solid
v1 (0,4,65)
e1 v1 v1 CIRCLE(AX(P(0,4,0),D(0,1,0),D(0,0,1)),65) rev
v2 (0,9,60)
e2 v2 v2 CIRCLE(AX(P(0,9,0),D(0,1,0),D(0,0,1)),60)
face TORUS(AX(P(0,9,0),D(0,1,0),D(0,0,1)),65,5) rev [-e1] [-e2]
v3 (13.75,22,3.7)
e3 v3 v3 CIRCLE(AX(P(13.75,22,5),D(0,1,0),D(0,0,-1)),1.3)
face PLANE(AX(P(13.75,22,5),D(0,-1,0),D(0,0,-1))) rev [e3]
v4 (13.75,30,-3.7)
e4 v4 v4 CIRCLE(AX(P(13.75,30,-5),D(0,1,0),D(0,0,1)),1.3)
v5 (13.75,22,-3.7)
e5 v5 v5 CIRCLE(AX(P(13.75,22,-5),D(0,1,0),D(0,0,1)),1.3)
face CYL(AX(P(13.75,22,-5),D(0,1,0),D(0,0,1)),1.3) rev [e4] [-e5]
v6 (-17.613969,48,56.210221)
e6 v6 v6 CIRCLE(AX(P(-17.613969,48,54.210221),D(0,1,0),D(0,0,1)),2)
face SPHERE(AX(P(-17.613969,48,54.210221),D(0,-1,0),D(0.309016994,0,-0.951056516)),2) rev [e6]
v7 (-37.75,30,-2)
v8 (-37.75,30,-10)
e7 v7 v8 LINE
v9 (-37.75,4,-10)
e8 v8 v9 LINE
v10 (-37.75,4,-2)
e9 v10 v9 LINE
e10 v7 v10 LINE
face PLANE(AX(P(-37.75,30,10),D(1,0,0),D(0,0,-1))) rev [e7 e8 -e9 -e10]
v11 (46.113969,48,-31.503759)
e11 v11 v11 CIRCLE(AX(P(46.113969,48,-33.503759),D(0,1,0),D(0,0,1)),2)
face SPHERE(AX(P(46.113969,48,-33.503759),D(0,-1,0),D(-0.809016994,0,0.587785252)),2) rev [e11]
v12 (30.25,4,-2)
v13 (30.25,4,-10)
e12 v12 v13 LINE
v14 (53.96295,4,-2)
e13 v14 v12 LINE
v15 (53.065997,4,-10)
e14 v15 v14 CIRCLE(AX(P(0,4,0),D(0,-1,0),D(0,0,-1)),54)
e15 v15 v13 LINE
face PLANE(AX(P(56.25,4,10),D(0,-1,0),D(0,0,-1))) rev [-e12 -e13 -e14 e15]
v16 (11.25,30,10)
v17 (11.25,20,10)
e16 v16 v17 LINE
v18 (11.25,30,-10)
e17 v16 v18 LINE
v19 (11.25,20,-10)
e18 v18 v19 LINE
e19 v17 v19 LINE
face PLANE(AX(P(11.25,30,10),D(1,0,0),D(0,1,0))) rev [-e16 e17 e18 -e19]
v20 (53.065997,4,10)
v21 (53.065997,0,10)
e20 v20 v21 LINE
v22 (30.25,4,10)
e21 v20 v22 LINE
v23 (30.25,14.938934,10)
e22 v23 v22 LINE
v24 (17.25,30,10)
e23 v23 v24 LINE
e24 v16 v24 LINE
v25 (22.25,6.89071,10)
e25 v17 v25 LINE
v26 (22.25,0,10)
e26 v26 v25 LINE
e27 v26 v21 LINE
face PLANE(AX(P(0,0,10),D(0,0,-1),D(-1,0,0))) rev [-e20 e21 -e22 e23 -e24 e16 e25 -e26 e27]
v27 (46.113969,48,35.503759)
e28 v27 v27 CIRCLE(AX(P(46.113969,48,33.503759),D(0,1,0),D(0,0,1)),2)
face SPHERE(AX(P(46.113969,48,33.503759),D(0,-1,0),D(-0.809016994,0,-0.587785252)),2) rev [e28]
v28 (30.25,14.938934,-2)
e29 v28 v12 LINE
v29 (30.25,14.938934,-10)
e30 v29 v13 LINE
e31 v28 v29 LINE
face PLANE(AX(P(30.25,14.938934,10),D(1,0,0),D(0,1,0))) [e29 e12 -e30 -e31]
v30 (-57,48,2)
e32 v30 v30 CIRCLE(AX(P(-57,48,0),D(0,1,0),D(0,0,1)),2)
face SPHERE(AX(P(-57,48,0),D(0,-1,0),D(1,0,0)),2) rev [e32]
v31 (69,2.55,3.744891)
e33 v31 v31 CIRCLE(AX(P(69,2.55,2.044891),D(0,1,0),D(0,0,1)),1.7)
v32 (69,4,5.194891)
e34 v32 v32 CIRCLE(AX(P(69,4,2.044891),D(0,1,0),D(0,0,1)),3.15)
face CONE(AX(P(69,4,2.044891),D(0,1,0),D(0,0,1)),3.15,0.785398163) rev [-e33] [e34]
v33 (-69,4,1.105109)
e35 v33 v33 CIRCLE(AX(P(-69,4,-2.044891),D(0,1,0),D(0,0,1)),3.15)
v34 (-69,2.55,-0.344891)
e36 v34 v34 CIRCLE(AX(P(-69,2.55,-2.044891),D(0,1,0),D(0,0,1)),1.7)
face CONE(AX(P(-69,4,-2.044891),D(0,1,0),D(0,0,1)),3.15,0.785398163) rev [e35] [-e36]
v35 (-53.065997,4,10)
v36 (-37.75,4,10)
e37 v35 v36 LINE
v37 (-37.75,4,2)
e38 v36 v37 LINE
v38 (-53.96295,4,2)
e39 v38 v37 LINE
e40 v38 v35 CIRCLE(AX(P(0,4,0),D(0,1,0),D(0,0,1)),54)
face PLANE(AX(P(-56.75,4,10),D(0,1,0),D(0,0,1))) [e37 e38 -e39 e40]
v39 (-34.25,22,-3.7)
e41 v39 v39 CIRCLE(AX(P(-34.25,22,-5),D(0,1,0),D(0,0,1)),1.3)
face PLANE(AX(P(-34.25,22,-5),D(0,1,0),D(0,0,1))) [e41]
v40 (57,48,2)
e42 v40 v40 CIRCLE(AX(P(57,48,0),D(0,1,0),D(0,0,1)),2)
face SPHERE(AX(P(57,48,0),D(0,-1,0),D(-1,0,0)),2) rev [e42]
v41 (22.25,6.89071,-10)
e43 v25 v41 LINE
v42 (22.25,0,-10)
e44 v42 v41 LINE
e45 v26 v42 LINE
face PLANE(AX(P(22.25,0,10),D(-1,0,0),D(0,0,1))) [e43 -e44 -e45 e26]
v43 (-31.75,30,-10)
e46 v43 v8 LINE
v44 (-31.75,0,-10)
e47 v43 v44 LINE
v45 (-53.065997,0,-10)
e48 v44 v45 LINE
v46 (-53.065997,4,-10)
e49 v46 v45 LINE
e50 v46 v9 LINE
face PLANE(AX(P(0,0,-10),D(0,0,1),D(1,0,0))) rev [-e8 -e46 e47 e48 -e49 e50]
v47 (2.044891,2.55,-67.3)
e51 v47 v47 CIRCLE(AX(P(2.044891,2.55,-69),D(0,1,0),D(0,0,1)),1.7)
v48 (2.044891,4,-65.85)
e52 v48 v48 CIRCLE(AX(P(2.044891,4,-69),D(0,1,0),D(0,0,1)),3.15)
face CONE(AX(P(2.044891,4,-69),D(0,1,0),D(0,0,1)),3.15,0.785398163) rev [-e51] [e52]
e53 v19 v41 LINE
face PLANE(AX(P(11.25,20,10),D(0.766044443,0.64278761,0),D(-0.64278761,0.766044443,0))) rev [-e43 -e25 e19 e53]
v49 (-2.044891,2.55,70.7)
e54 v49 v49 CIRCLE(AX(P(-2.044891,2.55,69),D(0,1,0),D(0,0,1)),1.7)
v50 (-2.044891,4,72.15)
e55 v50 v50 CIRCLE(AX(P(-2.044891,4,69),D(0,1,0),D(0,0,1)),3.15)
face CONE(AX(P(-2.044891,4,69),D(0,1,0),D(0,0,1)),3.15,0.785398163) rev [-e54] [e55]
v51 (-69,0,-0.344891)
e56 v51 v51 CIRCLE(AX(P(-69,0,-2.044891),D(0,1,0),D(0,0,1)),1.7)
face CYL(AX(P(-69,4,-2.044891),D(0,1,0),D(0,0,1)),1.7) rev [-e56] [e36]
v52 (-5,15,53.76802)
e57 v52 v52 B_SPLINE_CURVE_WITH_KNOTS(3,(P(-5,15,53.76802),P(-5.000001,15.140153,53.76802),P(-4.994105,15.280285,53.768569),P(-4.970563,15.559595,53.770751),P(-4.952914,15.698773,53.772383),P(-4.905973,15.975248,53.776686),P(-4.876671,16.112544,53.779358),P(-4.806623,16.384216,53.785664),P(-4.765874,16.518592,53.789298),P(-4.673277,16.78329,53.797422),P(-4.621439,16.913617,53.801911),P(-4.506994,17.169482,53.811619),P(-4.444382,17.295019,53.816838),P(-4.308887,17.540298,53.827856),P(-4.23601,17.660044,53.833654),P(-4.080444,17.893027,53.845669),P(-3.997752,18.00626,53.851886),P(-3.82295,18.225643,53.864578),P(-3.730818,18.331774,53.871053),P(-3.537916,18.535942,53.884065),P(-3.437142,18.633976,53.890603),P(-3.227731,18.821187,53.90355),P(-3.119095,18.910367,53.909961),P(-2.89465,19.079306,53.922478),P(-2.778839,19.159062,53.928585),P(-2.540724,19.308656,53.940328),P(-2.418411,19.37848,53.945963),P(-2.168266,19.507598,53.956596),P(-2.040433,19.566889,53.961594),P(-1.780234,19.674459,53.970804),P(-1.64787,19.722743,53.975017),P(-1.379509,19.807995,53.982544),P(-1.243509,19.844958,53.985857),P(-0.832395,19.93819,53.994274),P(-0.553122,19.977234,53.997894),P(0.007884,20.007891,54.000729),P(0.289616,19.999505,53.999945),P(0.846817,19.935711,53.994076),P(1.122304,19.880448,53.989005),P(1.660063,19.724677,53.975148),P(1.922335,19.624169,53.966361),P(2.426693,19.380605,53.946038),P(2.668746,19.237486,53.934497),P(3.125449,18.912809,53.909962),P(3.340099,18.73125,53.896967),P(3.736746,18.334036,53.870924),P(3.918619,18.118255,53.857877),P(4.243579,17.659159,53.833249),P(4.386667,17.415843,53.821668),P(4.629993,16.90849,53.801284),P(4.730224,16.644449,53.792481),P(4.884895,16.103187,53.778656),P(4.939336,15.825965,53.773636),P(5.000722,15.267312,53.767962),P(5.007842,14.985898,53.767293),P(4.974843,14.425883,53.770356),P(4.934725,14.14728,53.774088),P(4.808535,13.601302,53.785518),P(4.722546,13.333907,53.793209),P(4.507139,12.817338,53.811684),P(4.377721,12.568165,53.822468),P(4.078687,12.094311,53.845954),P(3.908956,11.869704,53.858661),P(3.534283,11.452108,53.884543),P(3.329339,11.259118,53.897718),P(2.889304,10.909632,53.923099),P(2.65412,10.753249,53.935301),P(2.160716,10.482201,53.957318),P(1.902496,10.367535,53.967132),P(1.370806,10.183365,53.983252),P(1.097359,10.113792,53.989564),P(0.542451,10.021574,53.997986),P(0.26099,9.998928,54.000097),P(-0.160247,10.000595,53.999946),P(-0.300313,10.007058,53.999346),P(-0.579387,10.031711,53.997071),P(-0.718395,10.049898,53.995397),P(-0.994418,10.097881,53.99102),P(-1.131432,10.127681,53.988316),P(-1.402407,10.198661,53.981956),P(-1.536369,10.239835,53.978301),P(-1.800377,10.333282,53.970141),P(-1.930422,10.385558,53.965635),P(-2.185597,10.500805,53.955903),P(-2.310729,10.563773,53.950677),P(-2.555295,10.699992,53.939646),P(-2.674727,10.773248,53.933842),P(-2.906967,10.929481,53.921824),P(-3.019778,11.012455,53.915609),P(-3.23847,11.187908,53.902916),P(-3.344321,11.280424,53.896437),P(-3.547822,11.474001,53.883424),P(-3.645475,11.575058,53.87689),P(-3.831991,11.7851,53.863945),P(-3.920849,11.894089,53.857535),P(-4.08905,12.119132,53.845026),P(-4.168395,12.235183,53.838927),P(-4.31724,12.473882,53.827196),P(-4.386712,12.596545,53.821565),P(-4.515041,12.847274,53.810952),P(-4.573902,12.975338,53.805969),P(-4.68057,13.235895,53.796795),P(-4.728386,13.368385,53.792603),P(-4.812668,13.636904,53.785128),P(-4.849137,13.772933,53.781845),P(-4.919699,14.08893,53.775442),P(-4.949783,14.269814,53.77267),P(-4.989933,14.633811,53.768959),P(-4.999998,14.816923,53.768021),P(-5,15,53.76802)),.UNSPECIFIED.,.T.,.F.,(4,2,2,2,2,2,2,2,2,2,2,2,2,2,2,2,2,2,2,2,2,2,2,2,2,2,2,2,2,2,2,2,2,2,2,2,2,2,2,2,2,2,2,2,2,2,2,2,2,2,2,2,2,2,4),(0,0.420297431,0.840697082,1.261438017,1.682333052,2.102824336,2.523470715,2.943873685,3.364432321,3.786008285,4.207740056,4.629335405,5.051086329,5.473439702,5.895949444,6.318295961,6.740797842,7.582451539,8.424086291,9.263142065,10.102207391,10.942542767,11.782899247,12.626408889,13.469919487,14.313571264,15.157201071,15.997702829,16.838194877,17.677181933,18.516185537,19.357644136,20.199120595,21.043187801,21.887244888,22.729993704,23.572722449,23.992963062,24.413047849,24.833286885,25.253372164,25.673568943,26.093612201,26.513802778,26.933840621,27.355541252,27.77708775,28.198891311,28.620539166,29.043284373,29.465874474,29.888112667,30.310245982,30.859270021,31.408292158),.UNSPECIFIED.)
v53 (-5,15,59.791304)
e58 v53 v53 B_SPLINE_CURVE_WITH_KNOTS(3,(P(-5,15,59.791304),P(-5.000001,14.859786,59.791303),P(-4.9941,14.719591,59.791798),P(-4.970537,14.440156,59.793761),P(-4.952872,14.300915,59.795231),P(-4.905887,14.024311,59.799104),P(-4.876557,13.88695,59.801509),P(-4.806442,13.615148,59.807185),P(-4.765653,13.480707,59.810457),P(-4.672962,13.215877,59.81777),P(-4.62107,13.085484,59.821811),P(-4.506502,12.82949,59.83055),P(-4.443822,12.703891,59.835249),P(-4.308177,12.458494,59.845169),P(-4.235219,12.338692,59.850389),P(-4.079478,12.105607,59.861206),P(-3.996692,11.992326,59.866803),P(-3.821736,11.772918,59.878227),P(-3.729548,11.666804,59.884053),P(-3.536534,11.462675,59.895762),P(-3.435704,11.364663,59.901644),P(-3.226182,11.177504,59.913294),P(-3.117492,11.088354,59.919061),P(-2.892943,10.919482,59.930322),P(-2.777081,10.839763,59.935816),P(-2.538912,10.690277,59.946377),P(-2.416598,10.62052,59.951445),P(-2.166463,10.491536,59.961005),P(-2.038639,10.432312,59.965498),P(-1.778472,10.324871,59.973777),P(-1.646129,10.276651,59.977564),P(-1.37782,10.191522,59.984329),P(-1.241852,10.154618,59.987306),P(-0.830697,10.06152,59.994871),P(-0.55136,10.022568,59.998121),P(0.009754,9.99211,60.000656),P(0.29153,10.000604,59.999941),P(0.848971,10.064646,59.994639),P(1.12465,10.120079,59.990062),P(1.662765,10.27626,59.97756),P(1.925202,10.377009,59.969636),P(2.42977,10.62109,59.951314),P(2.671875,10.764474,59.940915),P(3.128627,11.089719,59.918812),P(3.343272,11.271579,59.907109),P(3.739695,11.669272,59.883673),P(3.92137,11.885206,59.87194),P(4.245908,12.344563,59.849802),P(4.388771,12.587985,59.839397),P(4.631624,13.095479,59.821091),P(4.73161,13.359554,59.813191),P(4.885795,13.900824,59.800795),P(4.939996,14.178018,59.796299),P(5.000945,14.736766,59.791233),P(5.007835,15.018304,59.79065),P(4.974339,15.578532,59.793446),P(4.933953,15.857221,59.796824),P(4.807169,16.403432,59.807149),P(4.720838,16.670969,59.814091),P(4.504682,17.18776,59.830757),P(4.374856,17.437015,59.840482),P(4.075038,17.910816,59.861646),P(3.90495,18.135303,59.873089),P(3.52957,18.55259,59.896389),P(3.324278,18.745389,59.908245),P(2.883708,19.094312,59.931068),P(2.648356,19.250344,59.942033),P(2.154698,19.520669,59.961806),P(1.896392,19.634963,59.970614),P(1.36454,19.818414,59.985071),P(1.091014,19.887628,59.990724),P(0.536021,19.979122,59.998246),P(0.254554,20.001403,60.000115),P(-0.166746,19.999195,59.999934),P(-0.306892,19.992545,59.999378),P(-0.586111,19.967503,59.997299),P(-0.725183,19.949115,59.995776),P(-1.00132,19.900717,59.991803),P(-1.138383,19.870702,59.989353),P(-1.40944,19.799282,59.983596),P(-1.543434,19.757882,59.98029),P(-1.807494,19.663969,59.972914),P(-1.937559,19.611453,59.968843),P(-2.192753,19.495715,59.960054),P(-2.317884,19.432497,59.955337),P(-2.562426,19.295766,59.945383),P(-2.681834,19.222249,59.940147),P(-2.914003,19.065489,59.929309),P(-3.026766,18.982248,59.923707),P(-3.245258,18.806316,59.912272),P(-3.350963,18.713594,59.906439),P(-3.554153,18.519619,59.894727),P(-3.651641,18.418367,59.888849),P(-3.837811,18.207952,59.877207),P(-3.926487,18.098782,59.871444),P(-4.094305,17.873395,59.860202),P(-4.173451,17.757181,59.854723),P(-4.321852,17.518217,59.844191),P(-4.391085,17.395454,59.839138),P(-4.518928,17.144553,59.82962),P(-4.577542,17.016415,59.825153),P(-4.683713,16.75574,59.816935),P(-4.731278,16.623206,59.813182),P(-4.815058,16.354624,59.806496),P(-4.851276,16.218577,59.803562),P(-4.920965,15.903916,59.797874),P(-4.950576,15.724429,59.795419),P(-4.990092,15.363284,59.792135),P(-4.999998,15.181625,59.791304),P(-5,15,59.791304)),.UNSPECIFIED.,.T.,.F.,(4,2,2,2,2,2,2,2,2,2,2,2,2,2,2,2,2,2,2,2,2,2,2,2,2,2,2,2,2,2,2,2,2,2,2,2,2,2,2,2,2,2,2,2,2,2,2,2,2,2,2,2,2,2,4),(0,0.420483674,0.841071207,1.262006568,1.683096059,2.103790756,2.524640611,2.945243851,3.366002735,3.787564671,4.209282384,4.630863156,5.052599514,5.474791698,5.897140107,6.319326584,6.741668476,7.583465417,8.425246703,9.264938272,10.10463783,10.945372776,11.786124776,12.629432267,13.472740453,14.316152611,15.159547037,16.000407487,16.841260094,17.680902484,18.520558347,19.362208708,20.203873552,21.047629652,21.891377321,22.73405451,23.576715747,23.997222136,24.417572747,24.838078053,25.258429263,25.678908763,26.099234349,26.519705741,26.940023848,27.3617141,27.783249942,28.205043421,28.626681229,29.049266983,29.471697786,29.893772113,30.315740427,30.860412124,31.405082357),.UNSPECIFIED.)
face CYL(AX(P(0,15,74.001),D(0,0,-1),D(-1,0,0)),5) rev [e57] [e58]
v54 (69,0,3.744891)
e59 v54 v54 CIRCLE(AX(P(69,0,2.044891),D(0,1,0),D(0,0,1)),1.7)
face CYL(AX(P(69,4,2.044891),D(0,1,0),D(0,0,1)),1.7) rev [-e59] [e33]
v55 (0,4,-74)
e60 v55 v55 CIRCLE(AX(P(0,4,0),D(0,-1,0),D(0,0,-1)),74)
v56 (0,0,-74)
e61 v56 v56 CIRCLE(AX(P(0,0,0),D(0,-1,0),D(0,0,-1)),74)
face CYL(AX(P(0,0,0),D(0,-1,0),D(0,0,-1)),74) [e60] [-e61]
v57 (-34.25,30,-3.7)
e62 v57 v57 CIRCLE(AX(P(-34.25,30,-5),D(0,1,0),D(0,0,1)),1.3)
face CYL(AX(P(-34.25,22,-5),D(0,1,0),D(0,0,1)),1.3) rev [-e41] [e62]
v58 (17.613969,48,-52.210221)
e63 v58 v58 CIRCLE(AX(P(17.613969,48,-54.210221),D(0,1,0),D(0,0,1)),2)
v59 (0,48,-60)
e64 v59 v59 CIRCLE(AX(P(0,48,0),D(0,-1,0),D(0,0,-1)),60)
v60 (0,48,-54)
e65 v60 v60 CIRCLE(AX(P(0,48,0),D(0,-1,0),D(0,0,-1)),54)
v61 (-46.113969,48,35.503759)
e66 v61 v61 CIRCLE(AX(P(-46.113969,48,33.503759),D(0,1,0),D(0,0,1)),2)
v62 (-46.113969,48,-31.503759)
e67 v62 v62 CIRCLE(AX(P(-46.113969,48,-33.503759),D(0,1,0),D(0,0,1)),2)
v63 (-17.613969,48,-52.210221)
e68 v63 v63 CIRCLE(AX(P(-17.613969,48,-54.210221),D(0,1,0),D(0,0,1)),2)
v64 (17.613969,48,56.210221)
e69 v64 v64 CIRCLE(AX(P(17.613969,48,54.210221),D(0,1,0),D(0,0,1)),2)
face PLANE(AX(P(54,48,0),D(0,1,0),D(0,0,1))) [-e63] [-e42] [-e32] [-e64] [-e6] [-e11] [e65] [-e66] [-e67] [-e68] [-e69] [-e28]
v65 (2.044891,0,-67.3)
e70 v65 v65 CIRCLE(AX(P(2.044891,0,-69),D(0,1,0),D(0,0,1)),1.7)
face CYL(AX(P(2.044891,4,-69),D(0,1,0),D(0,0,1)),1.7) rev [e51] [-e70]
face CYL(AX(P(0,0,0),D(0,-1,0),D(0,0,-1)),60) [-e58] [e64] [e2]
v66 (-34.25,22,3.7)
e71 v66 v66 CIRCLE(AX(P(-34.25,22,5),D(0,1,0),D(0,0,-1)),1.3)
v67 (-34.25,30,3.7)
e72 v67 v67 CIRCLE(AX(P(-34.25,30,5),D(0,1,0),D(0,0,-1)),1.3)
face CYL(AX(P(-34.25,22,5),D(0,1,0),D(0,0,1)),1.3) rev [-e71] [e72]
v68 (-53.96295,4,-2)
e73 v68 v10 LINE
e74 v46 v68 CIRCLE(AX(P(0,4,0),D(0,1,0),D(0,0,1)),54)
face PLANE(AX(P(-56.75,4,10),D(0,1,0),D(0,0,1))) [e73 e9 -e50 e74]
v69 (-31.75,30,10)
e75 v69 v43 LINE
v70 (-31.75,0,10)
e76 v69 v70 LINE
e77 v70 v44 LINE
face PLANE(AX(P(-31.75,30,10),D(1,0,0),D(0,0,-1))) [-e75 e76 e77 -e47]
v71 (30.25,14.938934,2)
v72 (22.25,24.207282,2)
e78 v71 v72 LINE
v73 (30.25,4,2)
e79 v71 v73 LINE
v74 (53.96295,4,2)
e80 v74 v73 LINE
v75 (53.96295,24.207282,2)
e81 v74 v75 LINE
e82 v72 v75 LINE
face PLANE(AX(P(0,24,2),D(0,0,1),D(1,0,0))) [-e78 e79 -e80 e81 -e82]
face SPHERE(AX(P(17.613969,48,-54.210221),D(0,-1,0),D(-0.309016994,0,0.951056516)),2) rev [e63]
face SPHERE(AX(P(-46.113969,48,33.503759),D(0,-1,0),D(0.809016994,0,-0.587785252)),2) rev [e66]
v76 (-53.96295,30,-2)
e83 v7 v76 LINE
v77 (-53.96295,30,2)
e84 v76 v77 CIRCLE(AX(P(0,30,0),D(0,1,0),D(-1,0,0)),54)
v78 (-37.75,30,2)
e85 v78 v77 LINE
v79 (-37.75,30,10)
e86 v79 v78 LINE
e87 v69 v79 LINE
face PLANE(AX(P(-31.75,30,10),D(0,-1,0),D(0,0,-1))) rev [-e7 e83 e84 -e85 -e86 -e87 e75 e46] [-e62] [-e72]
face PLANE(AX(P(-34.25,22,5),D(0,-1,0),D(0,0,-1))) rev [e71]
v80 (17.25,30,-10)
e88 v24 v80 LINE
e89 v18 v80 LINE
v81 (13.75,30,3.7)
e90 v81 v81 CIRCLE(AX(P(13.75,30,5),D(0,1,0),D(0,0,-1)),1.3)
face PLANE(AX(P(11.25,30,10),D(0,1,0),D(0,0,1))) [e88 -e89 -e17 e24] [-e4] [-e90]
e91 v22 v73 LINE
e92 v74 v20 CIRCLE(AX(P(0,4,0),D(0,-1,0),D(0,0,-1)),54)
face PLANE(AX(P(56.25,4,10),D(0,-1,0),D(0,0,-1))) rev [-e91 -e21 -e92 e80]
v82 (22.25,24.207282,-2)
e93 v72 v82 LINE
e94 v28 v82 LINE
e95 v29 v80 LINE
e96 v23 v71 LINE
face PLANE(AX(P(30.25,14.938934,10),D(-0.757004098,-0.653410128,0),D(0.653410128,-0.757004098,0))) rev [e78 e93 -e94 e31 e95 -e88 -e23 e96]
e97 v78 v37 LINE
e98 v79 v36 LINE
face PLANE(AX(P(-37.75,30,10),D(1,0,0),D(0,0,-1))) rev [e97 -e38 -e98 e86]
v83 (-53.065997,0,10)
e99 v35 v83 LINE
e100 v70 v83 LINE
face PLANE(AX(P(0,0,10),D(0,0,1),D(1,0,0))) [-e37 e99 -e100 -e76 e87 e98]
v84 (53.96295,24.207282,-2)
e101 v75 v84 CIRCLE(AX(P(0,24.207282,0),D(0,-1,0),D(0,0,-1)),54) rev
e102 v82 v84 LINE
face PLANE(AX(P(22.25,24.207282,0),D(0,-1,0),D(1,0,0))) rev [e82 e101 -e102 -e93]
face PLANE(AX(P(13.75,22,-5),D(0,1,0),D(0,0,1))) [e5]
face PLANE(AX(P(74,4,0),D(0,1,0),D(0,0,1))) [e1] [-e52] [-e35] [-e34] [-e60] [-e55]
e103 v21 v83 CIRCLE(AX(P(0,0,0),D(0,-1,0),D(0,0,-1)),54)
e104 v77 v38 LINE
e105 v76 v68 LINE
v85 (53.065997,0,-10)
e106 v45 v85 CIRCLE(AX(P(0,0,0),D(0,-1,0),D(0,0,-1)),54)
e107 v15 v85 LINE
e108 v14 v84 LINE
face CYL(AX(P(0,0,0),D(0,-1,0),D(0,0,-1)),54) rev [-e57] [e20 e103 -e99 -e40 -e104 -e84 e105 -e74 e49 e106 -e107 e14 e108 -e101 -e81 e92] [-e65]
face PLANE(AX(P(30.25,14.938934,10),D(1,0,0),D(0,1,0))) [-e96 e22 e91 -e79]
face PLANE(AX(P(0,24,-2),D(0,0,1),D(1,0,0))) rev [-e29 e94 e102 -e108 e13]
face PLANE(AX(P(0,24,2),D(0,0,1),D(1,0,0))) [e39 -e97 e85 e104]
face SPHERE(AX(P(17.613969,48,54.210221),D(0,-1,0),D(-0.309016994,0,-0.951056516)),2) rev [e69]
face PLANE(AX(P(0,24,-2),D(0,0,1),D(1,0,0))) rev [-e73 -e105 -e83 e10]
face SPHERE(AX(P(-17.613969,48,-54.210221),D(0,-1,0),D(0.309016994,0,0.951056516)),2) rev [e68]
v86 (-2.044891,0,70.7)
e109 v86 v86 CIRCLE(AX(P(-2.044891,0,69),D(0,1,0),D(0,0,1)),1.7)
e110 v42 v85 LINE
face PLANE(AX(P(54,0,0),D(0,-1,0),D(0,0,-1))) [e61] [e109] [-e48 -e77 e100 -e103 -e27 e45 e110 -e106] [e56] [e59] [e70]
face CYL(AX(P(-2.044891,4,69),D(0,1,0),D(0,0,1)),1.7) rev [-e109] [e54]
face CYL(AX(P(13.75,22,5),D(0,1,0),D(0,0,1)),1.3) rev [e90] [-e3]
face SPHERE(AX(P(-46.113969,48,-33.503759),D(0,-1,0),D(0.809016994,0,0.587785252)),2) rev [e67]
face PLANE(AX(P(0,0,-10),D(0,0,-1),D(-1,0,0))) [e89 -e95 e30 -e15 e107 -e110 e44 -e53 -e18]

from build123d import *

# Parameters (mm, degrees)
FILLET1_R                                            = 5
CSK_FOR_M3_COUNTERSUNK_RAISED_HEAD_SCREW_D           = 3.4
CSK_FOR_M3_COUNTERSUNK_RAISED_HEAD_SCREW_CSINK_D     = 6.3
CSK_FOR_M3_COUNTERSUNK_RAISED_HEAD_SCREW_CSINK_ANGLE = 90
CIRPATTERN2_COUNT                                    = 4
CIRPATTERN3_COUNT                                    = 10
BOSS_EXTRUDE1_DEPTH                                  = 10
SKETCH14_R                                           = 1.3
CUT_EXTRUDE1_DEPTH                                   = 8
RIB1_REACH                                           = 117.135
SKETCH15_WALL_W                                      = 251.269407434
SKETCH15_WALL_H                                      = 4
RIB2_REACH                                           = 117.135
SKETCH16_WALL_W                                      = 266.269407434
SKETCH16_WALL_H                                      = 4
CUT_EXTRUDE3_REACH                                   = 117.135
SKETCH17_R                                           = 5


with BuildPart() as part:
    # Sketch1 → Revolve2 (revolve)
    with BuildSketch(Plane.XY):
        Polygon((54, 0), (54, 48), (60, 48), (60, 4), (74, 4), (74, 0), align=None)
    revolve(axis=Axis((0, 0, 0), (0, 1, 0)))

    # Fillet1
    fillet1_edges = [part.edges().sort_by_distance(p)[0] for p in [
        (-60, 4, 0),
    ]]
    fillet(fillet1_edges, radius=FILLET1_R)

    # CSK for M3 Countersunk Raised Head Screw1 (through all)
    with Locations(Plane(origin=(0, 4, 0), x_dir=(1, 0, 0), z_dir=(0, 1, 0))):
        with Locations((2.044890775, 69)):
            csk_for_m3_countersunk_raised_head_screw = CounterSinkHole(CSK_FOR_M3_COUNTERSUNK_RAISED_HEAD_SCREW_D / 2, CSK_FOR_M3_COUNTERSUNK_RAISED_HEAD_SCREW_CSINK_D / 2, counter_sink_angle=CSK_FOR_M3_COUNTERSUNK_RAISED_HEAD_SCREW_CSINK_ANGLE)

    # CirPattern2: CSK for M3 Countersunk Raised Head Screw1 ×4 about axis
    cirpattern2_axis = Axis((0, 4, 0), (0, -1, 0))
    for i in range(1, CIRPATTERN2_COUNT):
        add(csk_for_m3_countersunk_raised_head_screw.rotate(cirpattern2_axis, i * 360 / CIRPATTERN2_COUNT), mode=Mode.SUBTRACT)

    # Sketch10 → Cut-Revolve3 (revolve, cut)
    with BuildSketch(Plane.XY):
        with BuildLine():
            Line((57, 46), (57, 50))
            ThreePointArc((57, 50), (59, 48), (57, 46))
        make_face()
    cut_revolve3 = revolve(axis=Axis((57, 46, 0), (0, 1, 0)), mode=Mode.SUBTRACT)

    # CirPattern3: Cut-Revolve3 ×10 about axis
    cirpattern3_axis = Axis((0, 0, 0), (0, -1, 0))
    for i in range(1, CIRPATTERN3_COUNT):
        add(cut_revolve3.rotate(cirpattern3_axis, i * 360 / CIRPATTERN3_COUNT), mode=Mode.SUBTRACT)

    # Sketch11 → Boss-Extrude1 (add, symmetric)
    with BuildSketch(Plane.XY):
        Polygon((22.25, 0), (56.25, 0), (56.25, 4), (30.25, 4), (30.25, 14.938933676), (17.25, 30), (11.25, 30), (11.25, 20), (22.25, 6.890710481), align=None)
        Polygon((-37.75, 30), (-37.75, 4), (-56.75, 4), (-56.75, 0), (-31.75, 0), (-31.75, 30), align=None)
    extrude(amount=BOSS_EXTRUDE1_DEPTH, both=True)

    # Sketch14 → Cut-Extrude1 (cut)
    with BuildSketch(Plane(origin=(0, 30, 0), x_dir=(1, 0, 0), z_dir=(0, 1, 0))):
        with Locations((-34.25, 5)):
            Circle(SKETCH14_R)
        with Locations((-34.25, -5)):
            Circle(SKETCH14_R)
        with Locations((13.75, 5)):
            Circle(SKETCH14_R)
        with Locations((13.75, -5)):
            Circle(SKETCH14_R)
    extrude(amount=-CUT_EXTRUDE1_DEPTH, mode=Mode.SUBTRACT)

    # Sketch15 wall → Rib1 (add, up to next)
    with BuildSketch(Plane(origin=(-47.25, 30, 0), x_dir=(-1, 0, 0), z_dir=(0, -1, 0)), mode=Mode.PRIVATE) as rib1_sk1:
        Rectangle(SKETCH15_WALL_W, SKETCH15_WALL_H)
    rib1_tool1 = extrude(rib1_sk1.sketch, amount=RIB1_REACH, mode=Mode.PRIVATE) - part.part
    add(rib1_tool1.solids().sort_by_distance((-47.25, 30, 0))[0])

    # Sketch16 wall → Rib2 (add, up to next)
    with BuildSketch(Plane(origin=(39.25, 24.207282183, 0), x_dir=(1, 0, 0), z_dir=(0, 1, 0)), mode=Mode.PRIVATE) as rib2_sk1:
        Rectangle(SKETCH16_WALL_W, SKETCH16_WALL_H)
    rib2_tool1 = extrude(rib2_sk1.sketch, amount=-RIB2_REACH, mode=Mode.PRIVATE) - part.part
    add(rib2_tool1.solids().sort_by_distance((39.25, 24.207282183, 0))[0])

    # Sketch17 → Cut-Extrude3 (cut, up to next)
    with BuildSketch(Plane.XY, mode=Mode.PRIVATE) as cut_extrude3_sk1:
        with Locations((0, 15)):
            Circle(SKETCH17_R)
    cut_extrude3_tool1 = extrude(cut_extrude3_sk1.sketch, amount=CUT_EXTRUDE3_REACH, mode=Mode.PRIVATE) & part.part
    add(cut_extrude3_tool1.solids().sort_by_distance((0, 15, 0))[0], mode=Mode.SUBTRACT)


solid = part.part
